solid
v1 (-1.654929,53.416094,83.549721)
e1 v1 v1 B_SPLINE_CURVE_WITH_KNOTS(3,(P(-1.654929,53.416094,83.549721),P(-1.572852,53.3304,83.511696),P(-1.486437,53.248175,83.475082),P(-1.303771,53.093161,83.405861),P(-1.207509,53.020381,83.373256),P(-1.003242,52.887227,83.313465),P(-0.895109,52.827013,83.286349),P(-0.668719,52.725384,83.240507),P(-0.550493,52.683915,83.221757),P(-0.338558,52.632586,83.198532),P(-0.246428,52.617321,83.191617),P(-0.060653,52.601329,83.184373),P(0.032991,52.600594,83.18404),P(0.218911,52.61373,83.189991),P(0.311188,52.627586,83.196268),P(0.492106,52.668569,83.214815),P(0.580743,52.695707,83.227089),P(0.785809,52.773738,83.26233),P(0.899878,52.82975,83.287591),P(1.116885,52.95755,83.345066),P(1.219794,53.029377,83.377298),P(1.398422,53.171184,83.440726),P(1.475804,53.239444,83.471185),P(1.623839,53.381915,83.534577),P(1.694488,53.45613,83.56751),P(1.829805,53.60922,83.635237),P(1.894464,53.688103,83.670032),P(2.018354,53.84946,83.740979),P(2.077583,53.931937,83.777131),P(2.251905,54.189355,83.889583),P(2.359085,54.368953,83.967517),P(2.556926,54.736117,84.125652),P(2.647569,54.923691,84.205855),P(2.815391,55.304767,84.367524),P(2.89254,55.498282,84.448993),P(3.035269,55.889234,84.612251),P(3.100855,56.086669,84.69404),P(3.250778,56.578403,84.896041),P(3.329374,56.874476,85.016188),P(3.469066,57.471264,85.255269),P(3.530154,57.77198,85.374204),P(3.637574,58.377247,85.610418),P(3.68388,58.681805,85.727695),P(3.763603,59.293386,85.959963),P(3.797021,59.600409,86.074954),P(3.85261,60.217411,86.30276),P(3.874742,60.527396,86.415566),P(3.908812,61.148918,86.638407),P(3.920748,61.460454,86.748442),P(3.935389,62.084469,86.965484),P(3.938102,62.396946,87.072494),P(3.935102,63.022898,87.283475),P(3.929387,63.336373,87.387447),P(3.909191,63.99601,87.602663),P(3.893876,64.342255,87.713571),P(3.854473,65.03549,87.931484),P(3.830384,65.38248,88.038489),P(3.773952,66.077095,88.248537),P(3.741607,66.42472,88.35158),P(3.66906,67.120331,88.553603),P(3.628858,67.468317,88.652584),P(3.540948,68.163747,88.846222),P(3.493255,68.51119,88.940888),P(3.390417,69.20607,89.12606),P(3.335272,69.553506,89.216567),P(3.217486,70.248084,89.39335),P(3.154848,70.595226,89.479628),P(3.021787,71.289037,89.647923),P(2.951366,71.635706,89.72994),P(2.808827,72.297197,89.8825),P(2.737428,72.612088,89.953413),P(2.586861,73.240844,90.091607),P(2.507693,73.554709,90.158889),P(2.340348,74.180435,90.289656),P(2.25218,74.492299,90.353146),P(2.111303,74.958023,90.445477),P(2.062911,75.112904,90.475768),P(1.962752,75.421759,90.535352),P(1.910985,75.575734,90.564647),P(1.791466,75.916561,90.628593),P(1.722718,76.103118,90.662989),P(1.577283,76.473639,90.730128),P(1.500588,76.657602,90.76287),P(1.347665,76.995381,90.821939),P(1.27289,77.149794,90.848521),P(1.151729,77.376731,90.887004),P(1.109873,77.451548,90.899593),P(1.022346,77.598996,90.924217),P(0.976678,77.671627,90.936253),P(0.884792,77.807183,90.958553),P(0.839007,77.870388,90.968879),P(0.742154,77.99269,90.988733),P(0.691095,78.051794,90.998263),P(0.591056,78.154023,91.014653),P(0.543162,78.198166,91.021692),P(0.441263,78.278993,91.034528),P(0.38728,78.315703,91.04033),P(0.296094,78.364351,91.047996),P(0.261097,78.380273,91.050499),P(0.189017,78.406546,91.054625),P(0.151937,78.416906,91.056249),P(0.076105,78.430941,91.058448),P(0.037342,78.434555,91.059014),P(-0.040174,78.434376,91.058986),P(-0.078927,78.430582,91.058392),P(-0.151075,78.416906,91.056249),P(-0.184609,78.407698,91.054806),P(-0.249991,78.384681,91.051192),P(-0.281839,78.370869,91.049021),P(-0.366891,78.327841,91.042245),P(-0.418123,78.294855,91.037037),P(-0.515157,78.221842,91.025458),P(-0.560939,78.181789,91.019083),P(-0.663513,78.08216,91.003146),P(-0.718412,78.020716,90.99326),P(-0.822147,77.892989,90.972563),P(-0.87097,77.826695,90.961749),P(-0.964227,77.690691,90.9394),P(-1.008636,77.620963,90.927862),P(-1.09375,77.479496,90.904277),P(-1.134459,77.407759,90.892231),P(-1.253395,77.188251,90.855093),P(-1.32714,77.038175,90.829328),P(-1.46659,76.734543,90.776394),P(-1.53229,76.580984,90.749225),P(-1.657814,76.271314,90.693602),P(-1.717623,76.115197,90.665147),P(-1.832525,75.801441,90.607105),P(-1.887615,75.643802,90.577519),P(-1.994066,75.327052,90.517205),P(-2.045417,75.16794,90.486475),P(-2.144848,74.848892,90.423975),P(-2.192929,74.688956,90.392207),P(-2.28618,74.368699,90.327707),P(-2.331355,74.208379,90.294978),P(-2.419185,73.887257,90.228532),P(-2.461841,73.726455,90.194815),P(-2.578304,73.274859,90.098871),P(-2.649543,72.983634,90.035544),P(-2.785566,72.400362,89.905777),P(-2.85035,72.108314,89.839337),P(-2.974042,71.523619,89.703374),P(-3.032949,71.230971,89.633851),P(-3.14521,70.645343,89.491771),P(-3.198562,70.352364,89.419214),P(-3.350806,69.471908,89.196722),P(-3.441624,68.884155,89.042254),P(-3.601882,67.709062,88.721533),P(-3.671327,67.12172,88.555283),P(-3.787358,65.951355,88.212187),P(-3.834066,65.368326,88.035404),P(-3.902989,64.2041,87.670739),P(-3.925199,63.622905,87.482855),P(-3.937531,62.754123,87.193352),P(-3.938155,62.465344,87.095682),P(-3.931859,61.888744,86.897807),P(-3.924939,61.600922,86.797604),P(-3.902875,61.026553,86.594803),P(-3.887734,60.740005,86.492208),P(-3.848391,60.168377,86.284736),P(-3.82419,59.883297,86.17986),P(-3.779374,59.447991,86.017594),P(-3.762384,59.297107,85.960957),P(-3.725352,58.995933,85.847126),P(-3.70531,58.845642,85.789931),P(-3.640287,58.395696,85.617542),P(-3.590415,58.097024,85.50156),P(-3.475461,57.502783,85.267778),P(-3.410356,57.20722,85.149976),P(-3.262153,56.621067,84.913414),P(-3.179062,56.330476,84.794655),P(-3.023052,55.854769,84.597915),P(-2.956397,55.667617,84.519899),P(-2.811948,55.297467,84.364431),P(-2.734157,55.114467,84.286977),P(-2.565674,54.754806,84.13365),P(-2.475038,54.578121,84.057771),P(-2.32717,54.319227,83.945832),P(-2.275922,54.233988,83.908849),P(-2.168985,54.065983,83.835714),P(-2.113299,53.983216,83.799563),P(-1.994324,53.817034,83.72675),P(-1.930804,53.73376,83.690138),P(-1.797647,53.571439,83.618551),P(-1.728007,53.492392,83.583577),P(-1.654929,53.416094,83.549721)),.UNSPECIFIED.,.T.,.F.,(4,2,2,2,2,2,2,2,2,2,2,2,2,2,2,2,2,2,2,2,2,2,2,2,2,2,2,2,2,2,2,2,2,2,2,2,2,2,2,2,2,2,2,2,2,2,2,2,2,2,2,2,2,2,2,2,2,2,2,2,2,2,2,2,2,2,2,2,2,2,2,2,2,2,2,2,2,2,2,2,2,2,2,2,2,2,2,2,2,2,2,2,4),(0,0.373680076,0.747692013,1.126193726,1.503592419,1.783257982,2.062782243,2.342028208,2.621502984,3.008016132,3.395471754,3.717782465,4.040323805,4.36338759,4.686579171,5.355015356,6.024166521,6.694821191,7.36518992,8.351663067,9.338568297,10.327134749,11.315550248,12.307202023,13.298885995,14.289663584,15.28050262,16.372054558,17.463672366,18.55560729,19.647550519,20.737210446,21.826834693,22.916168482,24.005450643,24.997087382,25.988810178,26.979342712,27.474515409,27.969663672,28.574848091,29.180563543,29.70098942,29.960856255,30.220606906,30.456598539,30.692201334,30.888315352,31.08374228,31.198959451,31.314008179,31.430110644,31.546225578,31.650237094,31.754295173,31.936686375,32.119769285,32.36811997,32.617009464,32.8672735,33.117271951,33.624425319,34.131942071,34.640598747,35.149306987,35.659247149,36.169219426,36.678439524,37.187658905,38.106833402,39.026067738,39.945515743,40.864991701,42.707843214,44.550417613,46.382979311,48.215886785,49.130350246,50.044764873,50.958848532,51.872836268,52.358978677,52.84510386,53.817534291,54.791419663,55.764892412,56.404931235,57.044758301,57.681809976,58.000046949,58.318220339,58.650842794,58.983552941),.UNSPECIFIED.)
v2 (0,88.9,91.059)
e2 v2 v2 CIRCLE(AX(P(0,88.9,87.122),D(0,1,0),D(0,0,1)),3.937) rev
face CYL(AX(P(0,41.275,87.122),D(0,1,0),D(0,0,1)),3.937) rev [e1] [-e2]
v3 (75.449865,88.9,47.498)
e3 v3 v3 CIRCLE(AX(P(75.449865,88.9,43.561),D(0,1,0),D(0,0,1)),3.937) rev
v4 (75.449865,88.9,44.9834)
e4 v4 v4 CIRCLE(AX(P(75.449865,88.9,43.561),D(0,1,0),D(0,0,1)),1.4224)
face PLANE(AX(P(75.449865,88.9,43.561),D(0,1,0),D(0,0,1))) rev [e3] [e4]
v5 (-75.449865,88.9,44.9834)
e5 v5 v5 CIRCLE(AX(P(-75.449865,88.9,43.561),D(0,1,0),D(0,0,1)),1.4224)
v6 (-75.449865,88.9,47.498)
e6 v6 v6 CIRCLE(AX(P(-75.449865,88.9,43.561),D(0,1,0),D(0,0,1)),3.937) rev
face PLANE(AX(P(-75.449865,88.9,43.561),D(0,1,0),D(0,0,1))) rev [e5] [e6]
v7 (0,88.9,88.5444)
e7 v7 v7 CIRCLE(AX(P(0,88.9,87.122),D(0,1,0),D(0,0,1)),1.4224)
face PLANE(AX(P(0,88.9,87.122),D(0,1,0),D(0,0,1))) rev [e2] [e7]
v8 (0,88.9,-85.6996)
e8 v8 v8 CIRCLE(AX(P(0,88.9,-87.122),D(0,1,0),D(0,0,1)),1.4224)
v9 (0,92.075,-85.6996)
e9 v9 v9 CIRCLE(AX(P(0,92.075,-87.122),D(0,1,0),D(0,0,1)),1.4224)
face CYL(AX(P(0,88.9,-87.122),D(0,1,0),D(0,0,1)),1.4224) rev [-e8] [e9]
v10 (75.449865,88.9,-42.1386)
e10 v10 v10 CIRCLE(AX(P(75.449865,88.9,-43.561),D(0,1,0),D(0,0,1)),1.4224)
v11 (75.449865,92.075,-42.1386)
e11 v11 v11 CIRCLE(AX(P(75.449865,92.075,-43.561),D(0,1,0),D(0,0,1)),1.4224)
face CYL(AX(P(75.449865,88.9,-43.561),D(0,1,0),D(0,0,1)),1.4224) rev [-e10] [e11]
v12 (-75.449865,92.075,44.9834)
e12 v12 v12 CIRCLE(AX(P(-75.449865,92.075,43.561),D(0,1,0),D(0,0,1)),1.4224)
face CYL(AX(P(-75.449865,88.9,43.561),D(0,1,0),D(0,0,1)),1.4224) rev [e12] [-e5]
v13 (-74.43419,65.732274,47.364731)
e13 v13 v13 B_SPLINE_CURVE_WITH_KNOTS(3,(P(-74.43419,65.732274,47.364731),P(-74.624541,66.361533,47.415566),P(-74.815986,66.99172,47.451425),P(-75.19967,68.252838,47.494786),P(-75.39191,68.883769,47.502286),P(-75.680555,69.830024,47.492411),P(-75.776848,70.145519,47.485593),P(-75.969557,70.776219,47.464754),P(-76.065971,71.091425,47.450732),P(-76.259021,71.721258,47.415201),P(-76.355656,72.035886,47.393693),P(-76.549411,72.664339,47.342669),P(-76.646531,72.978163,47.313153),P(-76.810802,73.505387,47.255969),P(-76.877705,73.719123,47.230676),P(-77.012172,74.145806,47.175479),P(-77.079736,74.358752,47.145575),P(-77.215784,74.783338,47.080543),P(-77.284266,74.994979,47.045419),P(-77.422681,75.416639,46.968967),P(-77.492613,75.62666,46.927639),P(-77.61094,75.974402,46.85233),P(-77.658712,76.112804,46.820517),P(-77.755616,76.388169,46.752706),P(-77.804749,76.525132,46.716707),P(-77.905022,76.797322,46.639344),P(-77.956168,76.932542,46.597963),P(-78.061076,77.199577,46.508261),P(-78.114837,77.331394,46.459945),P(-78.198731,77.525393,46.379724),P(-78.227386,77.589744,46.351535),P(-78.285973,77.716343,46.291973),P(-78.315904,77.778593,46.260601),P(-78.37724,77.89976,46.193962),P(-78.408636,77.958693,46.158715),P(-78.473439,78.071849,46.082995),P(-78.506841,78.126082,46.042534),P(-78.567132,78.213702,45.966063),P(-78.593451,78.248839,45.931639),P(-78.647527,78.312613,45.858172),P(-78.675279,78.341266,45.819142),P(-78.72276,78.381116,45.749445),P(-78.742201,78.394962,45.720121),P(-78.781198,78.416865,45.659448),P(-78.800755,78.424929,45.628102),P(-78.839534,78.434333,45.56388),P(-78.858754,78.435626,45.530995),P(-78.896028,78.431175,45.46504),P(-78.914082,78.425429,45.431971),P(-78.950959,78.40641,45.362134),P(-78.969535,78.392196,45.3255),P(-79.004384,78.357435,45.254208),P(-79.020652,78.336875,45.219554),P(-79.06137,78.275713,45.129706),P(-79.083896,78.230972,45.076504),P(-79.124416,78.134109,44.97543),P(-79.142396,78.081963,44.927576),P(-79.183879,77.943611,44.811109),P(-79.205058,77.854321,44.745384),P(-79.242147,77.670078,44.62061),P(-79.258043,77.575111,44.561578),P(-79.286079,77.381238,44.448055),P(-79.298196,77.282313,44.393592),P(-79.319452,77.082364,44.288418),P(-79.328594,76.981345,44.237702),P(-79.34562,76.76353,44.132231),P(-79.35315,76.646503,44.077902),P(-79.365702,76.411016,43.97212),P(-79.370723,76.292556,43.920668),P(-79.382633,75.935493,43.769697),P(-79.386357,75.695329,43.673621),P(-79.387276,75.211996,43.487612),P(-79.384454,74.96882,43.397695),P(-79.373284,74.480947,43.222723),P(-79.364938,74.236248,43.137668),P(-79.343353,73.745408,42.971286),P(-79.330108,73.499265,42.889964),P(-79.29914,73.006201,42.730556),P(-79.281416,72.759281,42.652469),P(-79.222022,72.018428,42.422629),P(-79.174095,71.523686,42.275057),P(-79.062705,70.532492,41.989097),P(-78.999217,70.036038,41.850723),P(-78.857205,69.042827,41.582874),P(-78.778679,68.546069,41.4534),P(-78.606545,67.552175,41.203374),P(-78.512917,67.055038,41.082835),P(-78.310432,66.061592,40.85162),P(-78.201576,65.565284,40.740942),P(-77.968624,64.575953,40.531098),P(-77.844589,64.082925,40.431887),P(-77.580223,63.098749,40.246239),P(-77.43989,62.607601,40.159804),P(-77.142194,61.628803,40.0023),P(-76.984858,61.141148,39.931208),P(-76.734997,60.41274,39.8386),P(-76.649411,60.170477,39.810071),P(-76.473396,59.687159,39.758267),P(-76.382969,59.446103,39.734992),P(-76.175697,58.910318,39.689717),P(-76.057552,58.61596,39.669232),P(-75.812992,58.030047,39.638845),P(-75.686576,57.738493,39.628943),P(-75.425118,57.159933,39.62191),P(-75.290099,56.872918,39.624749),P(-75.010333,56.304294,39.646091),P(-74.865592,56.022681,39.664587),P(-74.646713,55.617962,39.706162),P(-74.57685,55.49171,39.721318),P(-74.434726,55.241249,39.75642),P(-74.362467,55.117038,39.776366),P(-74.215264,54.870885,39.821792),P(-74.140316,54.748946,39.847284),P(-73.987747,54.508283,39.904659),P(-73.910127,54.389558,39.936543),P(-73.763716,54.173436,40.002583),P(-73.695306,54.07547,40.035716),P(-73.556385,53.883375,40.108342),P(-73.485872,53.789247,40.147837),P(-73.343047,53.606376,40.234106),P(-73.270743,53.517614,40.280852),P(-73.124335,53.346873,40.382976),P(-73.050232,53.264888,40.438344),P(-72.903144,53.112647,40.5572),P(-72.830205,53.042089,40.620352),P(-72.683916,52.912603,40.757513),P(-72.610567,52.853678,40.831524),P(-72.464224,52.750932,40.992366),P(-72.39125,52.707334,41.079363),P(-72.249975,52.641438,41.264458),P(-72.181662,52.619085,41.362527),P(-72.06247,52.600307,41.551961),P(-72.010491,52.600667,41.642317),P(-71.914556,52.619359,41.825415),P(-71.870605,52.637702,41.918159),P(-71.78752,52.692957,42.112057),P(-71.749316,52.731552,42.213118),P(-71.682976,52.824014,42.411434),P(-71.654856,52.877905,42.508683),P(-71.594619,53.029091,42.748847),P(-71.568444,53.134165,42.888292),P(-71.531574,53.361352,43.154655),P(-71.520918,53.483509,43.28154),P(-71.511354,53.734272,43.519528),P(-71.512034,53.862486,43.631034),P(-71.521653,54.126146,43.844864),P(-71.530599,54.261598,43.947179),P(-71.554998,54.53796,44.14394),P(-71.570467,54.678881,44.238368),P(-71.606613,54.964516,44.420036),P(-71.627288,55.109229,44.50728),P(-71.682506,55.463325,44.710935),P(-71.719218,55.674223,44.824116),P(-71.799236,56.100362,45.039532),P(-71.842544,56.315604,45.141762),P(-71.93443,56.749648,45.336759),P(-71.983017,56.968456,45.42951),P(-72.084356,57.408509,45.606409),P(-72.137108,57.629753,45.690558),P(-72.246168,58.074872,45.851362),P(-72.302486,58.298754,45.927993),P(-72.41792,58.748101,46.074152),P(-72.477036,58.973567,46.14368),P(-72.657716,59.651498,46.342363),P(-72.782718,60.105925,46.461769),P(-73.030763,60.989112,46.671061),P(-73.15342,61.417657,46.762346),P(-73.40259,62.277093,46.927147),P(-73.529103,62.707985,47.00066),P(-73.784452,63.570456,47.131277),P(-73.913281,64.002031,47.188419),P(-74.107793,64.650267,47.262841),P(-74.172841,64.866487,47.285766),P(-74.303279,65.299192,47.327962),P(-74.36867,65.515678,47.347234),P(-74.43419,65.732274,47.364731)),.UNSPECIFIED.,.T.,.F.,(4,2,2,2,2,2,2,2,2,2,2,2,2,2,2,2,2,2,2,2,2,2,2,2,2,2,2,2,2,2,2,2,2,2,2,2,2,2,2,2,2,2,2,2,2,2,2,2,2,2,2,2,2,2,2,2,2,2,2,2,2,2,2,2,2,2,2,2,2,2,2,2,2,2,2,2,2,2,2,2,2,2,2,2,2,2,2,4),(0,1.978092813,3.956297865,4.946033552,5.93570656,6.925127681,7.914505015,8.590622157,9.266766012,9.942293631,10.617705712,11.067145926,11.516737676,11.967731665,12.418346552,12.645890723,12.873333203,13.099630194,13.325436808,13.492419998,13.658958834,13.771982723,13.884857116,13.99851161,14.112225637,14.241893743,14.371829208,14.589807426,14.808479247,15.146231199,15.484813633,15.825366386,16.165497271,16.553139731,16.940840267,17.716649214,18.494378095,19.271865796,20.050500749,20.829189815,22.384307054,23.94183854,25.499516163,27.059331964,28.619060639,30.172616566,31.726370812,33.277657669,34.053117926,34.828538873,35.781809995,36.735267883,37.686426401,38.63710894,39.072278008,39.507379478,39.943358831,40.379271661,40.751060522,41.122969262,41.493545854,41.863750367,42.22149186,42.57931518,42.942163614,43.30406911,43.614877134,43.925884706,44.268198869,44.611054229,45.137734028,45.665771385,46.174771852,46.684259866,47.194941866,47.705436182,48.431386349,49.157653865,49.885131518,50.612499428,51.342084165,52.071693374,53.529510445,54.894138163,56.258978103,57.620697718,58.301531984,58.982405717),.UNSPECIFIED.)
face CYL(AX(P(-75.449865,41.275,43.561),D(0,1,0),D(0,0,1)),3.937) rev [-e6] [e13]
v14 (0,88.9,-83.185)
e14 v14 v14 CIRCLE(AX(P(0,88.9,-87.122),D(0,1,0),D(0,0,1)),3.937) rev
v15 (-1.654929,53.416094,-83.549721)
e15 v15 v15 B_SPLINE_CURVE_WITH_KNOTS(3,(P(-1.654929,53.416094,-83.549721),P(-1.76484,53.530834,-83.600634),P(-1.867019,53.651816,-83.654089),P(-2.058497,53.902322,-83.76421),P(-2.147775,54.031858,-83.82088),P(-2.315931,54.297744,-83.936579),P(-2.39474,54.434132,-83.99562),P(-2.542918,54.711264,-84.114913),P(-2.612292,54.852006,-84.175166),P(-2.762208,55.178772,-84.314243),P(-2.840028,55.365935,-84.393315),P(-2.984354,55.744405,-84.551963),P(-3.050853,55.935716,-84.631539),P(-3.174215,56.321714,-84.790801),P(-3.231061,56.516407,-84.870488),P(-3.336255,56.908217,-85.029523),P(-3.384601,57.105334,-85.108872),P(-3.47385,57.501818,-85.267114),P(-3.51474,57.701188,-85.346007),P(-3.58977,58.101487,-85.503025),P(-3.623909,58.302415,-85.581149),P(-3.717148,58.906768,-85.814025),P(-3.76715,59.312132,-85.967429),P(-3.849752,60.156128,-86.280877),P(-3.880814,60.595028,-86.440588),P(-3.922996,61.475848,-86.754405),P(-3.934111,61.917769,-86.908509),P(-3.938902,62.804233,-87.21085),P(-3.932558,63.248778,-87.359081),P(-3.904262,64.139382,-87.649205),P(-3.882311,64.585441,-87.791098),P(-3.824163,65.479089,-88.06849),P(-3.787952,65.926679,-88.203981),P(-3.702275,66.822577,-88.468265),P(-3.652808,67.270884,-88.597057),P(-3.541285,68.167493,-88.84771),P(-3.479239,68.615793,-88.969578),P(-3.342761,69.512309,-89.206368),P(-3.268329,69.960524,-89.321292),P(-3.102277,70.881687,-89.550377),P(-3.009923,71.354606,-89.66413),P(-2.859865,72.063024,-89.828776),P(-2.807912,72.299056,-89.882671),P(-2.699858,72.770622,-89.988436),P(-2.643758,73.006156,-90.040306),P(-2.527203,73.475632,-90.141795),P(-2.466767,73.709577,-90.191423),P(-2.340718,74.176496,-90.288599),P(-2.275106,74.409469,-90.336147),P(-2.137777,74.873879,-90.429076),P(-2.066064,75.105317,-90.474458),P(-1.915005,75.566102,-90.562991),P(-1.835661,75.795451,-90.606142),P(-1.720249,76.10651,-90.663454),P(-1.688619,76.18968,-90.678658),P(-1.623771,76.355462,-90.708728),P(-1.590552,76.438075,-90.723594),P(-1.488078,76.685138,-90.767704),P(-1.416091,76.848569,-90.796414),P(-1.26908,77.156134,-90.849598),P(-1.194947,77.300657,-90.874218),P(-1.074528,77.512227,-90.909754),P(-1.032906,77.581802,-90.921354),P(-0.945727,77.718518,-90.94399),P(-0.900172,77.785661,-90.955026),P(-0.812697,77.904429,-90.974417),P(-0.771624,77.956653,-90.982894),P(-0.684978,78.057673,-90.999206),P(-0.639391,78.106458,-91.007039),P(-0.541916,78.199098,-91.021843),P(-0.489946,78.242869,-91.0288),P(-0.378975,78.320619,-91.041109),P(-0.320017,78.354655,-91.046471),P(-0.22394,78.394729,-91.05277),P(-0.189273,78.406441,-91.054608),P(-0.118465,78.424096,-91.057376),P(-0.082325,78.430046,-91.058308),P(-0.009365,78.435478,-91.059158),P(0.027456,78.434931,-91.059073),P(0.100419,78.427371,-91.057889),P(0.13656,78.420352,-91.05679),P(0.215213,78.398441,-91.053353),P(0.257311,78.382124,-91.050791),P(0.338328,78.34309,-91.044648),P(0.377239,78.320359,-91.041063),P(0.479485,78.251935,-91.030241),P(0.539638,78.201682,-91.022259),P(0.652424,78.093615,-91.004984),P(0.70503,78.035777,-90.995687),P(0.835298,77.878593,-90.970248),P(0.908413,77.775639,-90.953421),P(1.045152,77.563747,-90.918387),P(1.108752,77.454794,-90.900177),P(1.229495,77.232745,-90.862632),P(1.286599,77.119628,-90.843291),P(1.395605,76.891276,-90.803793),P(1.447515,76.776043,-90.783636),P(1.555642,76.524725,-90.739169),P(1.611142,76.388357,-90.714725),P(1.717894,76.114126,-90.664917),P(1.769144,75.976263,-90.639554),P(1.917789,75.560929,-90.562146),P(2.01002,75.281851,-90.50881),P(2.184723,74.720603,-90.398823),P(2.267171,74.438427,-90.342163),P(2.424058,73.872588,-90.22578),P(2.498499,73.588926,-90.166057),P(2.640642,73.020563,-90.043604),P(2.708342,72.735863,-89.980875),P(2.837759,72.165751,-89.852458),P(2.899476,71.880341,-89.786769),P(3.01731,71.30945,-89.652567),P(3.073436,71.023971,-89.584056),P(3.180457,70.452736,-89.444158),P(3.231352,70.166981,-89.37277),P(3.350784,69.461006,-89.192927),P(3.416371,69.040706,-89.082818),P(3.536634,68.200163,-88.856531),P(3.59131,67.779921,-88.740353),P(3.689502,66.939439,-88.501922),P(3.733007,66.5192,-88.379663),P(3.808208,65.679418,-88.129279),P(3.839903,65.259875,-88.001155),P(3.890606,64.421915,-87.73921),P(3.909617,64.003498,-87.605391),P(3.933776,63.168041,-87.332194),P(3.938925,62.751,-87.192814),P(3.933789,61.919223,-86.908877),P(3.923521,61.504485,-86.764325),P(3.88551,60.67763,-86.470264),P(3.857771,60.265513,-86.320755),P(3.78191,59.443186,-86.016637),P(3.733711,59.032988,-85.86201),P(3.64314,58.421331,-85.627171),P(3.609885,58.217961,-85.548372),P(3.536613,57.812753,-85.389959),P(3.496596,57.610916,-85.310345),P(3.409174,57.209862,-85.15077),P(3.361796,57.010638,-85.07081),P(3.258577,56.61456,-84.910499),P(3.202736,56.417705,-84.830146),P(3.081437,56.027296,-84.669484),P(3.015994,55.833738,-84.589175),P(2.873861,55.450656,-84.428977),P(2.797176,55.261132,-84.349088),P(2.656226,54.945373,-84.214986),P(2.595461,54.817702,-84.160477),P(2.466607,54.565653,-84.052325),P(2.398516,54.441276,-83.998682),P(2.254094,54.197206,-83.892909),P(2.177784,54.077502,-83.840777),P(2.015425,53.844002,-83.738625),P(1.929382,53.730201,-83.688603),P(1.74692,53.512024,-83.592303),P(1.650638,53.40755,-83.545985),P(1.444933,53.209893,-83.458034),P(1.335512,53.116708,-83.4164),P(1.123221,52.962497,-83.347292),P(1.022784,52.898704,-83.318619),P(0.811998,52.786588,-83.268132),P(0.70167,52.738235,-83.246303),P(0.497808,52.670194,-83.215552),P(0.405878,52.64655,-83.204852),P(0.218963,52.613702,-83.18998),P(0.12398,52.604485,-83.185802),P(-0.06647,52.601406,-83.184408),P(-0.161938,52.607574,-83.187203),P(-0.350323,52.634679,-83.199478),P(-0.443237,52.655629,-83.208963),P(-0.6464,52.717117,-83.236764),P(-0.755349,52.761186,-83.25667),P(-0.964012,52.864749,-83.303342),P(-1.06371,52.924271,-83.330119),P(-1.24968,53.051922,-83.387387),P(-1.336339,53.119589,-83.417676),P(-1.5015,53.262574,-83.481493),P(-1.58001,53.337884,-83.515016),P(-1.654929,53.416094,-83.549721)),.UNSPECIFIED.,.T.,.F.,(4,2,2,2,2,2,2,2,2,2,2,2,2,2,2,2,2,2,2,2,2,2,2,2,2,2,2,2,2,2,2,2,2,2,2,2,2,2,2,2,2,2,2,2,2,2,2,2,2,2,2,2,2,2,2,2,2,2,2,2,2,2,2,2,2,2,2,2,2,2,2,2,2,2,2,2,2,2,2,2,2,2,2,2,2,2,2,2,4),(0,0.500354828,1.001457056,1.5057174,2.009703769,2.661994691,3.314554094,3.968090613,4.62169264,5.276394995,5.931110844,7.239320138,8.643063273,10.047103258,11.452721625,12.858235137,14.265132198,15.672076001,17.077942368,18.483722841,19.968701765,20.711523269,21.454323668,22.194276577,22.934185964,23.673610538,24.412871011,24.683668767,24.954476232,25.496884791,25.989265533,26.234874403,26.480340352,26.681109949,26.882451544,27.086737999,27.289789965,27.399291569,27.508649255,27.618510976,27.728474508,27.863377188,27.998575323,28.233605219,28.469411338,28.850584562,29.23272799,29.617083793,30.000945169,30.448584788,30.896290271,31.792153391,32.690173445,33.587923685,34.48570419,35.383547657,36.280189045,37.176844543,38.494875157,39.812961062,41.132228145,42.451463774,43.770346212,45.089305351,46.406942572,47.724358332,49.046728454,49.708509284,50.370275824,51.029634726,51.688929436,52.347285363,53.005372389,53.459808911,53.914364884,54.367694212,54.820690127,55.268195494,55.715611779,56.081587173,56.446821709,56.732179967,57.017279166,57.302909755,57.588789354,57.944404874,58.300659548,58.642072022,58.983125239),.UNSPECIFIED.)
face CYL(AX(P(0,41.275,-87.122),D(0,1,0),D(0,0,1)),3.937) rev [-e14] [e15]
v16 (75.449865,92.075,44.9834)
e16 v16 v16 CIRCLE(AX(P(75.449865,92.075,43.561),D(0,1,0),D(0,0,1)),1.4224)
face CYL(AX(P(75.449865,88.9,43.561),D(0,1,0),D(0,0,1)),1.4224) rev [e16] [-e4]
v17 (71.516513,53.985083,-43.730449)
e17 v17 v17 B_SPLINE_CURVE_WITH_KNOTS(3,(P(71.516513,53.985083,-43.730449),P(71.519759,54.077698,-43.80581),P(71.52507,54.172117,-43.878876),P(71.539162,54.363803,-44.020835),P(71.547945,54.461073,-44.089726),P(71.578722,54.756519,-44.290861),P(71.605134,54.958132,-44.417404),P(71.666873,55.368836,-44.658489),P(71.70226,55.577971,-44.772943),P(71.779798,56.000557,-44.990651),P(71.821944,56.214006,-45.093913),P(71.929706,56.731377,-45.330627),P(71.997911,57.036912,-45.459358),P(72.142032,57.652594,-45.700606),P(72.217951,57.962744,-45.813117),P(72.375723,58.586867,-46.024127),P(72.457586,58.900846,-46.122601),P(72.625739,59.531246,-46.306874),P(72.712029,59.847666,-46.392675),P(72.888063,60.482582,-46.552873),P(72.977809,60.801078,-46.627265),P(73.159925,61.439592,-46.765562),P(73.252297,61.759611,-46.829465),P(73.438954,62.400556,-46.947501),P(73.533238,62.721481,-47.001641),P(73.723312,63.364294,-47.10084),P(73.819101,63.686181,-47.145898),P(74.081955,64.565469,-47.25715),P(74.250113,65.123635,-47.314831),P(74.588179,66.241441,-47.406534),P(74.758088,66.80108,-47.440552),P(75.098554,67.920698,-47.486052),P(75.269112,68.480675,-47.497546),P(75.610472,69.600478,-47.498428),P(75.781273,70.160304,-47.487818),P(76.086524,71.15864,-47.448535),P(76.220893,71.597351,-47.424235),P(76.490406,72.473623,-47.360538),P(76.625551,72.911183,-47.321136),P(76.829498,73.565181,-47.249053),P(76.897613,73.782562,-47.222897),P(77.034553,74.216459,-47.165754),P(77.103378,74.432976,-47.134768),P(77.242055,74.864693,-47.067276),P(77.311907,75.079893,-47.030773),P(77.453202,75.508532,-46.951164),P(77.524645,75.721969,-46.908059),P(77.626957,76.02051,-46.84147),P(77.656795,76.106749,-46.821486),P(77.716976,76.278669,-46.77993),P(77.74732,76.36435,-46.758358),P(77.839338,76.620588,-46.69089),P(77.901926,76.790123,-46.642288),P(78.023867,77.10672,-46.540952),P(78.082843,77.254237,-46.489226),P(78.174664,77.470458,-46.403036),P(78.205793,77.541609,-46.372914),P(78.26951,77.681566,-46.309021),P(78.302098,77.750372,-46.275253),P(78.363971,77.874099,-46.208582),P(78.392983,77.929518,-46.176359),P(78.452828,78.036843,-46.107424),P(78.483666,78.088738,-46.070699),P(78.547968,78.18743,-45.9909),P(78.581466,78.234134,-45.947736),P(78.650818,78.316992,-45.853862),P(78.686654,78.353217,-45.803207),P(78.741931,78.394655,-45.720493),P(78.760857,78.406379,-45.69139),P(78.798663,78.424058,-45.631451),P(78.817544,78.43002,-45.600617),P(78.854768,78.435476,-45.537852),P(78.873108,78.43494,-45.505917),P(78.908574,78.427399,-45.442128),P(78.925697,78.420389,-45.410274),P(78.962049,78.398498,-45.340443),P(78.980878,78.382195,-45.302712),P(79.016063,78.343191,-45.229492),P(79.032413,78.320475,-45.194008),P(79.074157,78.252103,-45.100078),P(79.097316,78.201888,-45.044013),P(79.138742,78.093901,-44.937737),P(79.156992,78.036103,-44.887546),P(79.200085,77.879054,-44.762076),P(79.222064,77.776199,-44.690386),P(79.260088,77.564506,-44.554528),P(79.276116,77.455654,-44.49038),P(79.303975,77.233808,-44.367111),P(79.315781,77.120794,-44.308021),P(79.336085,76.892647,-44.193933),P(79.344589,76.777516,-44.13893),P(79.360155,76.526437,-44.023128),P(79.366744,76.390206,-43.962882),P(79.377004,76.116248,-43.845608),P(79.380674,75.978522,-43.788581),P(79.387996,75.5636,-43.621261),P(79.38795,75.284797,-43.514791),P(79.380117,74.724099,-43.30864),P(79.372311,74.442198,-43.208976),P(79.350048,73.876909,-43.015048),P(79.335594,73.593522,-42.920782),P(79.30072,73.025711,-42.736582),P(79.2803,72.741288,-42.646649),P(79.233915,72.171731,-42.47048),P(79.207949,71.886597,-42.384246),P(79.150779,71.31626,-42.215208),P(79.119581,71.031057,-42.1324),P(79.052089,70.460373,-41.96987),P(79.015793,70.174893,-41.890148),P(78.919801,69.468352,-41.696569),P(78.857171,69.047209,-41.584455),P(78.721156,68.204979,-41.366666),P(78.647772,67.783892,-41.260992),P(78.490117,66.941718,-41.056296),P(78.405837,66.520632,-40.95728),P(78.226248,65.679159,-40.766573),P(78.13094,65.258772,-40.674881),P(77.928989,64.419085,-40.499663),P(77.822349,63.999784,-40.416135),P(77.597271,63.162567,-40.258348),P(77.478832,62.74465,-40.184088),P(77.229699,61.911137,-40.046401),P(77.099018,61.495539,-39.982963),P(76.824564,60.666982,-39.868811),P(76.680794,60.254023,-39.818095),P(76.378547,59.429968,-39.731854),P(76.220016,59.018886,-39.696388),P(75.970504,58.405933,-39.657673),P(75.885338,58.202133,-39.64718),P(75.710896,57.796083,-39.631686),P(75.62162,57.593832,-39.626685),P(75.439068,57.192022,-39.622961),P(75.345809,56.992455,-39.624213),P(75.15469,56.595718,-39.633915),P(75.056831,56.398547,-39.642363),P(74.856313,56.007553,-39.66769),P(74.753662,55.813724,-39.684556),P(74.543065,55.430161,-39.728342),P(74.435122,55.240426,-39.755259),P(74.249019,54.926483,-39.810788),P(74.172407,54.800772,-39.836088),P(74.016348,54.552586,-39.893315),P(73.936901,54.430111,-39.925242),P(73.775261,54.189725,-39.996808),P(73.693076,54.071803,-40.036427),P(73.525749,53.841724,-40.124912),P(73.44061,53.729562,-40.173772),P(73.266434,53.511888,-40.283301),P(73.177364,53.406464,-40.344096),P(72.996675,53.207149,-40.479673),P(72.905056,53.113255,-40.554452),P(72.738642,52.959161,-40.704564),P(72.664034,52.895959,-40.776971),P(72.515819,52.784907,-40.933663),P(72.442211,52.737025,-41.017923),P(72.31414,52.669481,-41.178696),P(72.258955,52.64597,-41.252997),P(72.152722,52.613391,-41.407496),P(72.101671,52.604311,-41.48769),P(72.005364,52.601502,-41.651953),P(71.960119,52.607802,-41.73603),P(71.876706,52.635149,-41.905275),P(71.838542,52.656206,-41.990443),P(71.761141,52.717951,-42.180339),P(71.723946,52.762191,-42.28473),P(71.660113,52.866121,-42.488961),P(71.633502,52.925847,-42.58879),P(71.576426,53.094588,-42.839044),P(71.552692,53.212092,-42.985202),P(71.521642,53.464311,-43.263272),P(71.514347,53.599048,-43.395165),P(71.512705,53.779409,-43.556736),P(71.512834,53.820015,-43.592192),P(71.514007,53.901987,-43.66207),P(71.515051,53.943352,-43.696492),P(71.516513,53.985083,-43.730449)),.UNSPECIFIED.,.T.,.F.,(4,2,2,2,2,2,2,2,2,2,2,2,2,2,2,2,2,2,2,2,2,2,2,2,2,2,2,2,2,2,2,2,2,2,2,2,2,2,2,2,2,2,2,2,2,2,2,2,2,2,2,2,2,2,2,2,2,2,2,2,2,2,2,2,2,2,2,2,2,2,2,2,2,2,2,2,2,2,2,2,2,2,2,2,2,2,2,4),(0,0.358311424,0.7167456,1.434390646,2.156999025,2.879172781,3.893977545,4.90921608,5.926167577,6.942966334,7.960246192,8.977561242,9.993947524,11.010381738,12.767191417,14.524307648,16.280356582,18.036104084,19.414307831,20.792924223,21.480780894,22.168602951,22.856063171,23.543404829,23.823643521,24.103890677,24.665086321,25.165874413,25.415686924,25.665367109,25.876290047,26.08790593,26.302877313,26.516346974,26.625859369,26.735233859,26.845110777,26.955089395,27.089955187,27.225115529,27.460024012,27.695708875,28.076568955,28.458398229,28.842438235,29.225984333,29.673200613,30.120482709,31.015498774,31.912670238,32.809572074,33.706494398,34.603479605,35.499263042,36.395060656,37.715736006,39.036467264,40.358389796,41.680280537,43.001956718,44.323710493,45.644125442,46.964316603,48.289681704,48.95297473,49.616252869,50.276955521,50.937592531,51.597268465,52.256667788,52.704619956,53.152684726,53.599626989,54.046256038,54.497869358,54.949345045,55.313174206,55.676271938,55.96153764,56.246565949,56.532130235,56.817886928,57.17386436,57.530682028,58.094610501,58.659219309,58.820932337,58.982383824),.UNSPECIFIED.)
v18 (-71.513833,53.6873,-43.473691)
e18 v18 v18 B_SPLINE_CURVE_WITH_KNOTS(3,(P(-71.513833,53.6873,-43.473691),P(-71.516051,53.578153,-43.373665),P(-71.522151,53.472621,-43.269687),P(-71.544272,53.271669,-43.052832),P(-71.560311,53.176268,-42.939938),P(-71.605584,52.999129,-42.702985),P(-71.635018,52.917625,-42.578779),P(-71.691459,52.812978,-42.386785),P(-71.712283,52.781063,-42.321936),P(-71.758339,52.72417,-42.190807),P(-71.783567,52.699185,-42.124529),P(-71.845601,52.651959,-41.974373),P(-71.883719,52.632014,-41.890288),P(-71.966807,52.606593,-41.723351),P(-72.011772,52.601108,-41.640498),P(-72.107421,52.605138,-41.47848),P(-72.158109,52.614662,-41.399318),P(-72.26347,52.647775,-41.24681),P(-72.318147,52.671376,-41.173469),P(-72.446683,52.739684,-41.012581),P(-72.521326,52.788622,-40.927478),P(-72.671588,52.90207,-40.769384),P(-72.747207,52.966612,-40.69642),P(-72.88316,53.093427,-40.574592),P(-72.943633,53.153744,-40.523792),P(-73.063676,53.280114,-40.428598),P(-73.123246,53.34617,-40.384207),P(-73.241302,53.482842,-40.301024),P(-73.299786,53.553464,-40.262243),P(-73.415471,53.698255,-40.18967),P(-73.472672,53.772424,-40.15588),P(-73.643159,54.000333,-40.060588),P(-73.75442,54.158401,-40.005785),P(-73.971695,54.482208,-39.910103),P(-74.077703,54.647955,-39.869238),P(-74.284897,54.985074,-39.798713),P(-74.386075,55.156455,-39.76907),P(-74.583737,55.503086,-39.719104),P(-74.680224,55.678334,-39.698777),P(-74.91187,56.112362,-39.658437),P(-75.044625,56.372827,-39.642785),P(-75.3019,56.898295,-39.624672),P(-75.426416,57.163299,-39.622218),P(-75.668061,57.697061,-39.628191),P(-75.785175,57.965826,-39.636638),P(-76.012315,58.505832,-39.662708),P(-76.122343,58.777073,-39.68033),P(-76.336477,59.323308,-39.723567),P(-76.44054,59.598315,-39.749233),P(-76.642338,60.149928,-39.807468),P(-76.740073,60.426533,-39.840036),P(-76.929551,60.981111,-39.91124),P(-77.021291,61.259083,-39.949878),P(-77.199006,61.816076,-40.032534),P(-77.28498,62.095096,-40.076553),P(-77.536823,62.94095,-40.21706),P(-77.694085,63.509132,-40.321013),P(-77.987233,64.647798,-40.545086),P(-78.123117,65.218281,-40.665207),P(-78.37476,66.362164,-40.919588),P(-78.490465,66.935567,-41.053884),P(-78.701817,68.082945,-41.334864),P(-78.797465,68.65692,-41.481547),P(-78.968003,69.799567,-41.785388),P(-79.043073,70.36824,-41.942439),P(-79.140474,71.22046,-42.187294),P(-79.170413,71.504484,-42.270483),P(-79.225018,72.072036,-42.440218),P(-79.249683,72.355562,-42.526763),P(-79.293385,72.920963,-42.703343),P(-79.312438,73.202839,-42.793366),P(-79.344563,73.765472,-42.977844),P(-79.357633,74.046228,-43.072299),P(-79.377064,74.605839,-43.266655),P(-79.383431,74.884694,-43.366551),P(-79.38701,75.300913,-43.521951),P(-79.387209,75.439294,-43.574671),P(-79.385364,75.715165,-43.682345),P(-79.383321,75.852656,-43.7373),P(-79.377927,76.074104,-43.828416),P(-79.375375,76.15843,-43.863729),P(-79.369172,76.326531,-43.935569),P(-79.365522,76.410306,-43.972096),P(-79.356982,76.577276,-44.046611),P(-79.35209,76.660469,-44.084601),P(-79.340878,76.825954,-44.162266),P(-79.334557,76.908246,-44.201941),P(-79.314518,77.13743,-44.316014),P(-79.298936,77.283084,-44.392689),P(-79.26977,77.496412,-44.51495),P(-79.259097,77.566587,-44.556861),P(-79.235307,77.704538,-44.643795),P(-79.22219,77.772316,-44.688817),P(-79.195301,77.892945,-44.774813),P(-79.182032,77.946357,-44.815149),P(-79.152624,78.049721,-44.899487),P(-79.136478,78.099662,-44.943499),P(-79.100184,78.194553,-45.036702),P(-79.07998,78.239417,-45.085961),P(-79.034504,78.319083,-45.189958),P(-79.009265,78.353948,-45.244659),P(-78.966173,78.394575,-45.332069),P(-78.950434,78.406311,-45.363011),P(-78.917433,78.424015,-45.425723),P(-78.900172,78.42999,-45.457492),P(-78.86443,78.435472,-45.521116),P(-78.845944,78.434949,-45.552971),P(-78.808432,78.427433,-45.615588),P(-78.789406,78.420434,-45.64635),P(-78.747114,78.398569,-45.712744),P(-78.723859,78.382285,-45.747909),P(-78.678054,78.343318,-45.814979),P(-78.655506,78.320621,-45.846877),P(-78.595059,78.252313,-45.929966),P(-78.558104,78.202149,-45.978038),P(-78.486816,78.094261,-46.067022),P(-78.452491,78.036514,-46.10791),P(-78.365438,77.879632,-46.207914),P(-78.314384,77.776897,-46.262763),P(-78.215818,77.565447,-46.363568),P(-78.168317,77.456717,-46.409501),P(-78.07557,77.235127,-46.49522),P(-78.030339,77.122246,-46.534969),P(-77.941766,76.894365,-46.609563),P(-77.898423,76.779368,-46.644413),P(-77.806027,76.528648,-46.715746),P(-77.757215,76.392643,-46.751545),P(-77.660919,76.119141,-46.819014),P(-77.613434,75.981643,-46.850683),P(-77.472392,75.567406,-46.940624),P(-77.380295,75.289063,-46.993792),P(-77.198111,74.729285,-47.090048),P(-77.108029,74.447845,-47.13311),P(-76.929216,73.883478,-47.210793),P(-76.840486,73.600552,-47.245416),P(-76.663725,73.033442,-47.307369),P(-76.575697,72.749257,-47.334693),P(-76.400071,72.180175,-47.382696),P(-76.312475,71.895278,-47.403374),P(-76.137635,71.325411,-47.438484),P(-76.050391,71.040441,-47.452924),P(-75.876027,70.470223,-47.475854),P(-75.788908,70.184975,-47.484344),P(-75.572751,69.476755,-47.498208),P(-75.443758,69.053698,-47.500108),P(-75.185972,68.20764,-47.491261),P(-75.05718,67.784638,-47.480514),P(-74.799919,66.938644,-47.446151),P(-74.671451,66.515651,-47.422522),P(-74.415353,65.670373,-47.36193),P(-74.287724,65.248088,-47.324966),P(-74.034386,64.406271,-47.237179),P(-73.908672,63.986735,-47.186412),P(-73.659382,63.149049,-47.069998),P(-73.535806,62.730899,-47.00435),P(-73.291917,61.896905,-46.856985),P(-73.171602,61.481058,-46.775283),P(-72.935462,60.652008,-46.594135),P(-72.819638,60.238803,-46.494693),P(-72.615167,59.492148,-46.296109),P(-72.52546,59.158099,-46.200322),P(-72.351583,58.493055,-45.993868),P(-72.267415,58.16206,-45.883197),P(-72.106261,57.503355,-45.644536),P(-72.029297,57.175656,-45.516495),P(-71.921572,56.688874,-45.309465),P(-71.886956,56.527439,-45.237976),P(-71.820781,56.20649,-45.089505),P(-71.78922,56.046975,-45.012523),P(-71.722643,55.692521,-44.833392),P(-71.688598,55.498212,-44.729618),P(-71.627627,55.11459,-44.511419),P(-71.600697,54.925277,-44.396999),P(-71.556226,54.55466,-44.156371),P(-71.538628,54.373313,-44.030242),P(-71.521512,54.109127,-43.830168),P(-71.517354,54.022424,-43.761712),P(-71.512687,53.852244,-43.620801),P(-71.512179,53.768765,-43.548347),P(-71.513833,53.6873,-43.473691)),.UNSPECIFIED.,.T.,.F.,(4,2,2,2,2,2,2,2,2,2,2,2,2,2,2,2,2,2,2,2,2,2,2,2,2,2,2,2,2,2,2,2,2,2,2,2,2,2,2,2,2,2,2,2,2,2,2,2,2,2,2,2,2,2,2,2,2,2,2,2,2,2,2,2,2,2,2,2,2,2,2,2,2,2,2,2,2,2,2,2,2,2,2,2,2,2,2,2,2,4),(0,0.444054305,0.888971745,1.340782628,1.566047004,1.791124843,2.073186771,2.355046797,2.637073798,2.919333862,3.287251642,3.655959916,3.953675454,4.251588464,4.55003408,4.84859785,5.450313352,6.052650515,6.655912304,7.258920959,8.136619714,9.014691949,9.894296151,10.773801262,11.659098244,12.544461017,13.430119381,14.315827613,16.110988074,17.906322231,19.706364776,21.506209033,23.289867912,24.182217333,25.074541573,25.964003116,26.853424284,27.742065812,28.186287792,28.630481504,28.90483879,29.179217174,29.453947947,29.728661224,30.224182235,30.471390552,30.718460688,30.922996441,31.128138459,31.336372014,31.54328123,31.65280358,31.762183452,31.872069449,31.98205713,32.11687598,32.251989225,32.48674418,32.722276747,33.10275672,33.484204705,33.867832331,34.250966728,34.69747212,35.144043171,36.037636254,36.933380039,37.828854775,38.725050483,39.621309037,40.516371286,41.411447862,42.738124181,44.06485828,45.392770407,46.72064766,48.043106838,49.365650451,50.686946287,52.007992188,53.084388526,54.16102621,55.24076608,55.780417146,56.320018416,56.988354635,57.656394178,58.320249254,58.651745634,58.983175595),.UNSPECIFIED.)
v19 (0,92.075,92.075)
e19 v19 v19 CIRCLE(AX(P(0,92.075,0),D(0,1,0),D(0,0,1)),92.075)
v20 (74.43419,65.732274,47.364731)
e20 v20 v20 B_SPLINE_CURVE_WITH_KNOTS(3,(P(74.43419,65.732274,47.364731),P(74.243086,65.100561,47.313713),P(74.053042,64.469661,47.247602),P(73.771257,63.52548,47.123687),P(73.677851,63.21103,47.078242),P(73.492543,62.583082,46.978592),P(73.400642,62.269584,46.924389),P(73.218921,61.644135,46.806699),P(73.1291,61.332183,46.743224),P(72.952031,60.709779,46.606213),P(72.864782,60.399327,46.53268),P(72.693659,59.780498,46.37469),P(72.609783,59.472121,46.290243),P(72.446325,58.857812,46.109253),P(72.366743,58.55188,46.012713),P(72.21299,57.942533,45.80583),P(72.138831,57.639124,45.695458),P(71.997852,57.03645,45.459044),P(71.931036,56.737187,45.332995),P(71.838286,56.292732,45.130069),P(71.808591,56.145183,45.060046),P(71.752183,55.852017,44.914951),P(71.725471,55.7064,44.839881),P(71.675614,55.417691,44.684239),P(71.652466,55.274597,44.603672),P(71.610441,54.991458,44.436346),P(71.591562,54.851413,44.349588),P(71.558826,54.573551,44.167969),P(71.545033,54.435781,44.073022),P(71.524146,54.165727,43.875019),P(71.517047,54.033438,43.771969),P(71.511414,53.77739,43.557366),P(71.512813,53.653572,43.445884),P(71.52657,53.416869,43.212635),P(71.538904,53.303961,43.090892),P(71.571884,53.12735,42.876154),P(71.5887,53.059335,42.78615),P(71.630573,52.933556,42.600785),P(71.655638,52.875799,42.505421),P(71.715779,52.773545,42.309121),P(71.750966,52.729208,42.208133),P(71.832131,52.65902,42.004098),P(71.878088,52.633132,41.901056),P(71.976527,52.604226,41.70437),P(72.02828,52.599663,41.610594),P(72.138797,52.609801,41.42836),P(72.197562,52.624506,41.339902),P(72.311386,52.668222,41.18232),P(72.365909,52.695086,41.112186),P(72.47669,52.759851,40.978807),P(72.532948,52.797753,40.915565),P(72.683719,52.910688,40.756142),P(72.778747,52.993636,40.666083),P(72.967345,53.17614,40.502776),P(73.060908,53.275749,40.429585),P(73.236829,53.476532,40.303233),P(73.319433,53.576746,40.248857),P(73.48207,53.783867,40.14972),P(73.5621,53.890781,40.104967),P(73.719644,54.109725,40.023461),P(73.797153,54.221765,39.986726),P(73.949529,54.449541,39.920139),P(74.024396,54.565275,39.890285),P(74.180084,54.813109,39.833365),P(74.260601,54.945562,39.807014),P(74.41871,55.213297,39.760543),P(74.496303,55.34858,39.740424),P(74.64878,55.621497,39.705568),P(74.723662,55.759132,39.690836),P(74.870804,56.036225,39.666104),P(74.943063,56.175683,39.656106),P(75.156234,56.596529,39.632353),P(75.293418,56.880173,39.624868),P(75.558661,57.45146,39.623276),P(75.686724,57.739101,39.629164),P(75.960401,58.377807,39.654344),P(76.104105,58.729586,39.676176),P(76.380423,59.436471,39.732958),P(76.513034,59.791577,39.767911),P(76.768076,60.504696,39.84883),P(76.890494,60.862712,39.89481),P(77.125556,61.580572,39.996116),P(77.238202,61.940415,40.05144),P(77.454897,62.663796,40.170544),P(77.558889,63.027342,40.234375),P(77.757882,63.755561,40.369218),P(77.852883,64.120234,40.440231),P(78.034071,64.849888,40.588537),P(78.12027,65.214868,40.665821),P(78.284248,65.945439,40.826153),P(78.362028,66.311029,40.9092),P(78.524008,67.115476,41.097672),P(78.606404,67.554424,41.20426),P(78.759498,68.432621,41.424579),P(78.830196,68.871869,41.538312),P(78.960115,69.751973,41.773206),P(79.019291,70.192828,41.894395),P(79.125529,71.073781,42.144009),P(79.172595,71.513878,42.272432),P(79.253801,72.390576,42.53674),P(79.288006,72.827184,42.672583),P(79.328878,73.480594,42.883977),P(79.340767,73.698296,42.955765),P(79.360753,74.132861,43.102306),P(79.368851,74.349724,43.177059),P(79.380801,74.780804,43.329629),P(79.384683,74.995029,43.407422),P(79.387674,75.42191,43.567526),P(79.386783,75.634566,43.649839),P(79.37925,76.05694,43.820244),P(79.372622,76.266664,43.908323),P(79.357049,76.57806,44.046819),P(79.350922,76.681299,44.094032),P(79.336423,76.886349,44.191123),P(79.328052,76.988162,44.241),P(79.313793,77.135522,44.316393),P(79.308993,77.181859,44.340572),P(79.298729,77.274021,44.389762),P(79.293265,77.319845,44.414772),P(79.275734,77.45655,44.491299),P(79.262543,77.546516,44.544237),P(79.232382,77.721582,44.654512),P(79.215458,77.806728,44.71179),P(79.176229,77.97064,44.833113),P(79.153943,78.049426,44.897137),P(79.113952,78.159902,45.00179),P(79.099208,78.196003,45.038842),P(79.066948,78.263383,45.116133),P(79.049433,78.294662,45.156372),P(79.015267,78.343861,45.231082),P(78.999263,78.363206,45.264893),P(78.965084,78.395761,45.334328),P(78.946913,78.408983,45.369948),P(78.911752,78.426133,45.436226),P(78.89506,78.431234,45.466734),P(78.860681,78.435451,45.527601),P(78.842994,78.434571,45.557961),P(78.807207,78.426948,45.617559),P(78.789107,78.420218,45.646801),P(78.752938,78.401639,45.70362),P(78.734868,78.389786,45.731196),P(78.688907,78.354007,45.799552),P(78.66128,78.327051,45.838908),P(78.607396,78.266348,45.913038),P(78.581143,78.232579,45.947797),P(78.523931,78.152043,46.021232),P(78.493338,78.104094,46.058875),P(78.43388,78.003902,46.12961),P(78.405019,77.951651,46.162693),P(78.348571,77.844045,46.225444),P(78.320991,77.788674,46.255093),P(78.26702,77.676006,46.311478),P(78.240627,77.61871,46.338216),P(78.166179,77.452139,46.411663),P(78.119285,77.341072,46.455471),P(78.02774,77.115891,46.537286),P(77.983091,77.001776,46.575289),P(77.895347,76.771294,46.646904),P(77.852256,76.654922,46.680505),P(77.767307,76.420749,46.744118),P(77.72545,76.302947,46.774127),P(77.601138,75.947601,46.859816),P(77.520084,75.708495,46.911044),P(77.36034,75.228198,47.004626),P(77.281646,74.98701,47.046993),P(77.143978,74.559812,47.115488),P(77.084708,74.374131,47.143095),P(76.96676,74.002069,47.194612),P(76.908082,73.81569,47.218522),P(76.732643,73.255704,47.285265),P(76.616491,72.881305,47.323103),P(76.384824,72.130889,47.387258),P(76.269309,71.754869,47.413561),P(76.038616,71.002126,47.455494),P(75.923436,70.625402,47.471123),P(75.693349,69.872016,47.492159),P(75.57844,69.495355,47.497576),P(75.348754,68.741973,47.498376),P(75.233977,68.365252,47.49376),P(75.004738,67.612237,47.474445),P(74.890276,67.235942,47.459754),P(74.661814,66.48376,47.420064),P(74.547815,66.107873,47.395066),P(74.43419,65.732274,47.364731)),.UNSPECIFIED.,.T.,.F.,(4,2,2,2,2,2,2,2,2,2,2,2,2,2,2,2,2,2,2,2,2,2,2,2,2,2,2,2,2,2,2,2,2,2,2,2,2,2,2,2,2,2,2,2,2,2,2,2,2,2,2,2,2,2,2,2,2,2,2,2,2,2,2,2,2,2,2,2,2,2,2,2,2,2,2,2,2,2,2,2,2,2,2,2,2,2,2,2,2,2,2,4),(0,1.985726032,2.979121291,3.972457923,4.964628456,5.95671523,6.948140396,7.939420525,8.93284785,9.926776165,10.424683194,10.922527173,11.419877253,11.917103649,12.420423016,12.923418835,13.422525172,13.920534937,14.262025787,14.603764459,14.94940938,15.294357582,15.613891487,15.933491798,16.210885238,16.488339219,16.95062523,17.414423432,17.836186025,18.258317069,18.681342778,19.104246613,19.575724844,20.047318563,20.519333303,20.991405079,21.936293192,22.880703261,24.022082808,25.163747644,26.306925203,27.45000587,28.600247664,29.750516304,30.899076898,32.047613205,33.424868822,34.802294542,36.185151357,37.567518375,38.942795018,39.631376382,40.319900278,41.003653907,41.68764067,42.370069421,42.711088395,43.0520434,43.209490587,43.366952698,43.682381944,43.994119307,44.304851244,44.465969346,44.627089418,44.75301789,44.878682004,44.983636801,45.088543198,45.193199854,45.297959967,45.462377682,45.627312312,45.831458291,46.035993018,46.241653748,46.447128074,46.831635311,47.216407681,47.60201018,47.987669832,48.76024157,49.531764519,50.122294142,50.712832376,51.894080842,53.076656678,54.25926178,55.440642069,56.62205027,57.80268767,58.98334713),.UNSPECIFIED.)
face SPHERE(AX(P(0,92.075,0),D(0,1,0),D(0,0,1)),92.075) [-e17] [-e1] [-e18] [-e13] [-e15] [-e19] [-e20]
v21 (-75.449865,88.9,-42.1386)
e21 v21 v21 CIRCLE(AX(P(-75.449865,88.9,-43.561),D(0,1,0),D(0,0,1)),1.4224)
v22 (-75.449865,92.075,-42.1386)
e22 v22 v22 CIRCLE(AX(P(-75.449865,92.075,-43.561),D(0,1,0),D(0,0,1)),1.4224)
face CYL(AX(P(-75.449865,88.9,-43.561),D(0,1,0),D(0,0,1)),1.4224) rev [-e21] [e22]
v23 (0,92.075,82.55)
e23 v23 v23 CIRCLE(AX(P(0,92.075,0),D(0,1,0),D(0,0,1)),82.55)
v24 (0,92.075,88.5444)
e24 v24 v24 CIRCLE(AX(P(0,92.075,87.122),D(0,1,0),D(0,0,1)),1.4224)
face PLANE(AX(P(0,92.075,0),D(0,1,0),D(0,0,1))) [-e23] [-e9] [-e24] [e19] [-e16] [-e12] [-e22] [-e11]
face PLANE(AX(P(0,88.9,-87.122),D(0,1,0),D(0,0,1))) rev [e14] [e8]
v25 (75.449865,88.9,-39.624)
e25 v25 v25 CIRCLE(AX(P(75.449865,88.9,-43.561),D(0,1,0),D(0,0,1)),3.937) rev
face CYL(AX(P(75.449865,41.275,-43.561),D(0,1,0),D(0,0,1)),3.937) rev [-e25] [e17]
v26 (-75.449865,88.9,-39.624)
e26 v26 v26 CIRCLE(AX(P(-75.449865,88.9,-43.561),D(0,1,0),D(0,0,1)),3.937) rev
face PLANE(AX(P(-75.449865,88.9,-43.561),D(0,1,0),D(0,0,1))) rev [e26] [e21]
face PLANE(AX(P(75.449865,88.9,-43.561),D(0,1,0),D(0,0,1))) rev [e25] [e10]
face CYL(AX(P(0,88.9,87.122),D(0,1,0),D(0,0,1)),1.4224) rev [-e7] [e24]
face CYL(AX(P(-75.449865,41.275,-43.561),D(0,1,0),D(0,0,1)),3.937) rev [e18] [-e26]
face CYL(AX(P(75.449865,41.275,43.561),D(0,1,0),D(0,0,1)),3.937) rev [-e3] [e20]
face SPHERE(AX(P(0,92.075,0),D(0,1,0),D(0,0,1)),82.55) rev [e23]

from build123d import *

# Parameters (mm, degrees)
SKETCH1_R           = 92.075
BOSS_EXTRUDE3_DEPTH = 92.075
SKETCH3_R           = 82.55
CUT_EXTRUDE1_DEPTH  = 82.55
FILLET12_R          = 82.55
FILLET13_R          = 92.075
SKETCH6_R           = 3.937
CUT_EXTRUDE3_DEPTH  = 50.8
SKETCH8_R           = 3.937
SKETCH8_R_2         = 1.4224
BOSS_EXTRUDE6_DEPTH = 3.175


with BuildPart() as part:
    # Sketch1 → Boss-Extrude3 (new body)
    with BuildSketch(Plane(origin=(0, 0, 0), x_dir=(1, 0, 0), z_dir=(0, 1, 0))):
        with Locations(Location((0, 0, 0), (0, 0, 270))):
            Circle(SKETCH1_R)
    extrude(amount=BOSS_EXTRUDE3_DEPTH)

    # Sketch3 → Cut-Extrude1 (cut)
    with BuildSketch(Plane(origin=(0, 92.075, 0), x_dir=(1, 0, 0), z_dir=(0, 1, 0))):
        with Locations(Location((0, 0, 0), (0, 0, 270))):
            Circle(SKETCH3_R)
    extrude(amount=-CUT_EXTRUDE1_DEPTH, mode=Mode.SUBTRACT)

    # Fillet12
    fillet12_edges = [part.edges().sort_by_distance(p)[0] for p in [
        (0, 9.525, -82.55),
    ]]
    fillet(fillet12_edges, radius=FILLET12_R - 0.0001)  # a hair under: the kernel refuses the full size

    # Fillet13
    fillet13_edges = [part.edges().sort_by_distance(p)[0] for p in [
        (0, 0, -92.075),
    ]]
    fillet(fillet13_edges, radius=FILLET13_R - 0.0001)  # a hair under: the kernel refuses the full size

    # Sketch6 → Cut-Extrude3 (cut)
    with BuildSketch(Plane(origin=(0, 92.075, 0), x_dir=(1, 0, 0), z_dir=(0, 1, 0))):
        with Locations(Location((0, 87.122, 0), (0, 0, 270))):
            Circle(SKETCH6_R)
        with Locations(Location((75.449865229, 43.561, 0), (0, 0, 270))):
            Circle(SKETCH6_R)
        with Locations(Location((75.449865229, -43.561, 0), (0, 0, 270))):
            Circle(SKETCH6_R)
        with Locations(Location((0, -87.122, 0), (0, 0, 270))):
            Circle(SKETCH6_R)
        with Locations(Location((-75.449865229, -43.561, 0), (0, 0, 270))):
            Circle(SKETCH6_R)
        with Locations(Location((-75.449865229, 43.561, 0), (0, 0, 270))):
            Circle(SKETCH6_R)
    extrude(amount=-CUT_EXTRUDE3_DEPTH, mode=Mode.SUBTRACT)

    # Sketch8 → Boss-Extrude6 (add)
    # profile 1 of 6: a face of its own
    with BuildSketch(Plane(origin=(0, 92.075, 0), x_dir=(1, 0, 0), z_dir=(0, 1, 0))):
        with Locations(Location((-75.449865229, -43.561, 0), (0, 0, 270))):
            Circle(SKETCH8_R)
        with Locations(Location((-75.449865229, -43.561, 0), (0, 0, 270))):
            Circle(SKETCH8_R_2, mode=Mode.SUBTRACT)
    # profile 2 of 6: a face of its own
    with BuildSketch(Plane(origin=(0, 92.075, 0), x_dir=(1, 0, 0), z_dir=(0, 1, 0))):
        with Locations(Location((0, -87.122, 0), (0, 0, 270))):
            Circle(SKETCH8_R)
        with Locations(Location((0, -87.122, 0), (0, 0, 270))):
            Circle(SKETCH8_R_2, mode=Mode.SUBTRACT)
    # profile 3 of 6: a face of its own
    with BuildSketch(Plane(origin=(0, 92.075, 0), x_dir=(1, 0, 0), z_dir=(0, 1, 0))):
        with Locations(Location((75.449865229, -43.561, 0), (0, 0, 270))):
            Circle(SKETCH8_R)
        with Locations(Location((75.449865229, -43.561, 0), (0, 0, 270))):
            Circle(SKETCH8_R_2, mode=Mode.SUBTRACT)
    # profile 4 of 6: a face of its own
    with BuildSketch(Plane(origin=(0, 92.075, 0), x_dir=(1, 0, 0), z_dir=(0, 1, 0))):
        with Locations(Location((75.449865229, 43.561, 0), (0, 0, 270))):
            Circle(SKETCH8_R)
        with Locations(Location((75.449865229, 43.561, 0), (0, 0, 270))):
            Circle(SKETCH8_R_2, mode=Mode.SUBTRACT)
    # profile 5 of 6: a face of its own
    with BuildSketch(Plane(origin=(0, 92.075, 0), x_dir=(1, 0, 0), z_dir=(0, 1, 0))):
        with Locations(Location((0, 87.122, 0), (0, 0, 270))):
            Circle(SKETCH8_R)
        with Locations(Location((0, 87.122, 0), (0, 0, 270))):
            Circle(SKETCH8_R_2, mode=Mode.SUBTRACT)
    # profile 6 of 6: a face of its own
    with BuildSketch(Plane(origin=(0, 92.075, 0), x_dir=(1, 0, 0), z_dir=(0, 1, 0))):
        with Locations(Location((-75.449865229, 43.561, 0), (0, 0, 270))):
            Circle(SKETCH8_R)
        with Locations(Location((-75.449865229, 43.561, 0), (0, 0, 270))):
            Circle(SKETCH8_R_2, mode=Mode.SUBTRACT)
    extrude(amount=-BOSS_EXTRUDE6_DEPTH)


solid = part.part
